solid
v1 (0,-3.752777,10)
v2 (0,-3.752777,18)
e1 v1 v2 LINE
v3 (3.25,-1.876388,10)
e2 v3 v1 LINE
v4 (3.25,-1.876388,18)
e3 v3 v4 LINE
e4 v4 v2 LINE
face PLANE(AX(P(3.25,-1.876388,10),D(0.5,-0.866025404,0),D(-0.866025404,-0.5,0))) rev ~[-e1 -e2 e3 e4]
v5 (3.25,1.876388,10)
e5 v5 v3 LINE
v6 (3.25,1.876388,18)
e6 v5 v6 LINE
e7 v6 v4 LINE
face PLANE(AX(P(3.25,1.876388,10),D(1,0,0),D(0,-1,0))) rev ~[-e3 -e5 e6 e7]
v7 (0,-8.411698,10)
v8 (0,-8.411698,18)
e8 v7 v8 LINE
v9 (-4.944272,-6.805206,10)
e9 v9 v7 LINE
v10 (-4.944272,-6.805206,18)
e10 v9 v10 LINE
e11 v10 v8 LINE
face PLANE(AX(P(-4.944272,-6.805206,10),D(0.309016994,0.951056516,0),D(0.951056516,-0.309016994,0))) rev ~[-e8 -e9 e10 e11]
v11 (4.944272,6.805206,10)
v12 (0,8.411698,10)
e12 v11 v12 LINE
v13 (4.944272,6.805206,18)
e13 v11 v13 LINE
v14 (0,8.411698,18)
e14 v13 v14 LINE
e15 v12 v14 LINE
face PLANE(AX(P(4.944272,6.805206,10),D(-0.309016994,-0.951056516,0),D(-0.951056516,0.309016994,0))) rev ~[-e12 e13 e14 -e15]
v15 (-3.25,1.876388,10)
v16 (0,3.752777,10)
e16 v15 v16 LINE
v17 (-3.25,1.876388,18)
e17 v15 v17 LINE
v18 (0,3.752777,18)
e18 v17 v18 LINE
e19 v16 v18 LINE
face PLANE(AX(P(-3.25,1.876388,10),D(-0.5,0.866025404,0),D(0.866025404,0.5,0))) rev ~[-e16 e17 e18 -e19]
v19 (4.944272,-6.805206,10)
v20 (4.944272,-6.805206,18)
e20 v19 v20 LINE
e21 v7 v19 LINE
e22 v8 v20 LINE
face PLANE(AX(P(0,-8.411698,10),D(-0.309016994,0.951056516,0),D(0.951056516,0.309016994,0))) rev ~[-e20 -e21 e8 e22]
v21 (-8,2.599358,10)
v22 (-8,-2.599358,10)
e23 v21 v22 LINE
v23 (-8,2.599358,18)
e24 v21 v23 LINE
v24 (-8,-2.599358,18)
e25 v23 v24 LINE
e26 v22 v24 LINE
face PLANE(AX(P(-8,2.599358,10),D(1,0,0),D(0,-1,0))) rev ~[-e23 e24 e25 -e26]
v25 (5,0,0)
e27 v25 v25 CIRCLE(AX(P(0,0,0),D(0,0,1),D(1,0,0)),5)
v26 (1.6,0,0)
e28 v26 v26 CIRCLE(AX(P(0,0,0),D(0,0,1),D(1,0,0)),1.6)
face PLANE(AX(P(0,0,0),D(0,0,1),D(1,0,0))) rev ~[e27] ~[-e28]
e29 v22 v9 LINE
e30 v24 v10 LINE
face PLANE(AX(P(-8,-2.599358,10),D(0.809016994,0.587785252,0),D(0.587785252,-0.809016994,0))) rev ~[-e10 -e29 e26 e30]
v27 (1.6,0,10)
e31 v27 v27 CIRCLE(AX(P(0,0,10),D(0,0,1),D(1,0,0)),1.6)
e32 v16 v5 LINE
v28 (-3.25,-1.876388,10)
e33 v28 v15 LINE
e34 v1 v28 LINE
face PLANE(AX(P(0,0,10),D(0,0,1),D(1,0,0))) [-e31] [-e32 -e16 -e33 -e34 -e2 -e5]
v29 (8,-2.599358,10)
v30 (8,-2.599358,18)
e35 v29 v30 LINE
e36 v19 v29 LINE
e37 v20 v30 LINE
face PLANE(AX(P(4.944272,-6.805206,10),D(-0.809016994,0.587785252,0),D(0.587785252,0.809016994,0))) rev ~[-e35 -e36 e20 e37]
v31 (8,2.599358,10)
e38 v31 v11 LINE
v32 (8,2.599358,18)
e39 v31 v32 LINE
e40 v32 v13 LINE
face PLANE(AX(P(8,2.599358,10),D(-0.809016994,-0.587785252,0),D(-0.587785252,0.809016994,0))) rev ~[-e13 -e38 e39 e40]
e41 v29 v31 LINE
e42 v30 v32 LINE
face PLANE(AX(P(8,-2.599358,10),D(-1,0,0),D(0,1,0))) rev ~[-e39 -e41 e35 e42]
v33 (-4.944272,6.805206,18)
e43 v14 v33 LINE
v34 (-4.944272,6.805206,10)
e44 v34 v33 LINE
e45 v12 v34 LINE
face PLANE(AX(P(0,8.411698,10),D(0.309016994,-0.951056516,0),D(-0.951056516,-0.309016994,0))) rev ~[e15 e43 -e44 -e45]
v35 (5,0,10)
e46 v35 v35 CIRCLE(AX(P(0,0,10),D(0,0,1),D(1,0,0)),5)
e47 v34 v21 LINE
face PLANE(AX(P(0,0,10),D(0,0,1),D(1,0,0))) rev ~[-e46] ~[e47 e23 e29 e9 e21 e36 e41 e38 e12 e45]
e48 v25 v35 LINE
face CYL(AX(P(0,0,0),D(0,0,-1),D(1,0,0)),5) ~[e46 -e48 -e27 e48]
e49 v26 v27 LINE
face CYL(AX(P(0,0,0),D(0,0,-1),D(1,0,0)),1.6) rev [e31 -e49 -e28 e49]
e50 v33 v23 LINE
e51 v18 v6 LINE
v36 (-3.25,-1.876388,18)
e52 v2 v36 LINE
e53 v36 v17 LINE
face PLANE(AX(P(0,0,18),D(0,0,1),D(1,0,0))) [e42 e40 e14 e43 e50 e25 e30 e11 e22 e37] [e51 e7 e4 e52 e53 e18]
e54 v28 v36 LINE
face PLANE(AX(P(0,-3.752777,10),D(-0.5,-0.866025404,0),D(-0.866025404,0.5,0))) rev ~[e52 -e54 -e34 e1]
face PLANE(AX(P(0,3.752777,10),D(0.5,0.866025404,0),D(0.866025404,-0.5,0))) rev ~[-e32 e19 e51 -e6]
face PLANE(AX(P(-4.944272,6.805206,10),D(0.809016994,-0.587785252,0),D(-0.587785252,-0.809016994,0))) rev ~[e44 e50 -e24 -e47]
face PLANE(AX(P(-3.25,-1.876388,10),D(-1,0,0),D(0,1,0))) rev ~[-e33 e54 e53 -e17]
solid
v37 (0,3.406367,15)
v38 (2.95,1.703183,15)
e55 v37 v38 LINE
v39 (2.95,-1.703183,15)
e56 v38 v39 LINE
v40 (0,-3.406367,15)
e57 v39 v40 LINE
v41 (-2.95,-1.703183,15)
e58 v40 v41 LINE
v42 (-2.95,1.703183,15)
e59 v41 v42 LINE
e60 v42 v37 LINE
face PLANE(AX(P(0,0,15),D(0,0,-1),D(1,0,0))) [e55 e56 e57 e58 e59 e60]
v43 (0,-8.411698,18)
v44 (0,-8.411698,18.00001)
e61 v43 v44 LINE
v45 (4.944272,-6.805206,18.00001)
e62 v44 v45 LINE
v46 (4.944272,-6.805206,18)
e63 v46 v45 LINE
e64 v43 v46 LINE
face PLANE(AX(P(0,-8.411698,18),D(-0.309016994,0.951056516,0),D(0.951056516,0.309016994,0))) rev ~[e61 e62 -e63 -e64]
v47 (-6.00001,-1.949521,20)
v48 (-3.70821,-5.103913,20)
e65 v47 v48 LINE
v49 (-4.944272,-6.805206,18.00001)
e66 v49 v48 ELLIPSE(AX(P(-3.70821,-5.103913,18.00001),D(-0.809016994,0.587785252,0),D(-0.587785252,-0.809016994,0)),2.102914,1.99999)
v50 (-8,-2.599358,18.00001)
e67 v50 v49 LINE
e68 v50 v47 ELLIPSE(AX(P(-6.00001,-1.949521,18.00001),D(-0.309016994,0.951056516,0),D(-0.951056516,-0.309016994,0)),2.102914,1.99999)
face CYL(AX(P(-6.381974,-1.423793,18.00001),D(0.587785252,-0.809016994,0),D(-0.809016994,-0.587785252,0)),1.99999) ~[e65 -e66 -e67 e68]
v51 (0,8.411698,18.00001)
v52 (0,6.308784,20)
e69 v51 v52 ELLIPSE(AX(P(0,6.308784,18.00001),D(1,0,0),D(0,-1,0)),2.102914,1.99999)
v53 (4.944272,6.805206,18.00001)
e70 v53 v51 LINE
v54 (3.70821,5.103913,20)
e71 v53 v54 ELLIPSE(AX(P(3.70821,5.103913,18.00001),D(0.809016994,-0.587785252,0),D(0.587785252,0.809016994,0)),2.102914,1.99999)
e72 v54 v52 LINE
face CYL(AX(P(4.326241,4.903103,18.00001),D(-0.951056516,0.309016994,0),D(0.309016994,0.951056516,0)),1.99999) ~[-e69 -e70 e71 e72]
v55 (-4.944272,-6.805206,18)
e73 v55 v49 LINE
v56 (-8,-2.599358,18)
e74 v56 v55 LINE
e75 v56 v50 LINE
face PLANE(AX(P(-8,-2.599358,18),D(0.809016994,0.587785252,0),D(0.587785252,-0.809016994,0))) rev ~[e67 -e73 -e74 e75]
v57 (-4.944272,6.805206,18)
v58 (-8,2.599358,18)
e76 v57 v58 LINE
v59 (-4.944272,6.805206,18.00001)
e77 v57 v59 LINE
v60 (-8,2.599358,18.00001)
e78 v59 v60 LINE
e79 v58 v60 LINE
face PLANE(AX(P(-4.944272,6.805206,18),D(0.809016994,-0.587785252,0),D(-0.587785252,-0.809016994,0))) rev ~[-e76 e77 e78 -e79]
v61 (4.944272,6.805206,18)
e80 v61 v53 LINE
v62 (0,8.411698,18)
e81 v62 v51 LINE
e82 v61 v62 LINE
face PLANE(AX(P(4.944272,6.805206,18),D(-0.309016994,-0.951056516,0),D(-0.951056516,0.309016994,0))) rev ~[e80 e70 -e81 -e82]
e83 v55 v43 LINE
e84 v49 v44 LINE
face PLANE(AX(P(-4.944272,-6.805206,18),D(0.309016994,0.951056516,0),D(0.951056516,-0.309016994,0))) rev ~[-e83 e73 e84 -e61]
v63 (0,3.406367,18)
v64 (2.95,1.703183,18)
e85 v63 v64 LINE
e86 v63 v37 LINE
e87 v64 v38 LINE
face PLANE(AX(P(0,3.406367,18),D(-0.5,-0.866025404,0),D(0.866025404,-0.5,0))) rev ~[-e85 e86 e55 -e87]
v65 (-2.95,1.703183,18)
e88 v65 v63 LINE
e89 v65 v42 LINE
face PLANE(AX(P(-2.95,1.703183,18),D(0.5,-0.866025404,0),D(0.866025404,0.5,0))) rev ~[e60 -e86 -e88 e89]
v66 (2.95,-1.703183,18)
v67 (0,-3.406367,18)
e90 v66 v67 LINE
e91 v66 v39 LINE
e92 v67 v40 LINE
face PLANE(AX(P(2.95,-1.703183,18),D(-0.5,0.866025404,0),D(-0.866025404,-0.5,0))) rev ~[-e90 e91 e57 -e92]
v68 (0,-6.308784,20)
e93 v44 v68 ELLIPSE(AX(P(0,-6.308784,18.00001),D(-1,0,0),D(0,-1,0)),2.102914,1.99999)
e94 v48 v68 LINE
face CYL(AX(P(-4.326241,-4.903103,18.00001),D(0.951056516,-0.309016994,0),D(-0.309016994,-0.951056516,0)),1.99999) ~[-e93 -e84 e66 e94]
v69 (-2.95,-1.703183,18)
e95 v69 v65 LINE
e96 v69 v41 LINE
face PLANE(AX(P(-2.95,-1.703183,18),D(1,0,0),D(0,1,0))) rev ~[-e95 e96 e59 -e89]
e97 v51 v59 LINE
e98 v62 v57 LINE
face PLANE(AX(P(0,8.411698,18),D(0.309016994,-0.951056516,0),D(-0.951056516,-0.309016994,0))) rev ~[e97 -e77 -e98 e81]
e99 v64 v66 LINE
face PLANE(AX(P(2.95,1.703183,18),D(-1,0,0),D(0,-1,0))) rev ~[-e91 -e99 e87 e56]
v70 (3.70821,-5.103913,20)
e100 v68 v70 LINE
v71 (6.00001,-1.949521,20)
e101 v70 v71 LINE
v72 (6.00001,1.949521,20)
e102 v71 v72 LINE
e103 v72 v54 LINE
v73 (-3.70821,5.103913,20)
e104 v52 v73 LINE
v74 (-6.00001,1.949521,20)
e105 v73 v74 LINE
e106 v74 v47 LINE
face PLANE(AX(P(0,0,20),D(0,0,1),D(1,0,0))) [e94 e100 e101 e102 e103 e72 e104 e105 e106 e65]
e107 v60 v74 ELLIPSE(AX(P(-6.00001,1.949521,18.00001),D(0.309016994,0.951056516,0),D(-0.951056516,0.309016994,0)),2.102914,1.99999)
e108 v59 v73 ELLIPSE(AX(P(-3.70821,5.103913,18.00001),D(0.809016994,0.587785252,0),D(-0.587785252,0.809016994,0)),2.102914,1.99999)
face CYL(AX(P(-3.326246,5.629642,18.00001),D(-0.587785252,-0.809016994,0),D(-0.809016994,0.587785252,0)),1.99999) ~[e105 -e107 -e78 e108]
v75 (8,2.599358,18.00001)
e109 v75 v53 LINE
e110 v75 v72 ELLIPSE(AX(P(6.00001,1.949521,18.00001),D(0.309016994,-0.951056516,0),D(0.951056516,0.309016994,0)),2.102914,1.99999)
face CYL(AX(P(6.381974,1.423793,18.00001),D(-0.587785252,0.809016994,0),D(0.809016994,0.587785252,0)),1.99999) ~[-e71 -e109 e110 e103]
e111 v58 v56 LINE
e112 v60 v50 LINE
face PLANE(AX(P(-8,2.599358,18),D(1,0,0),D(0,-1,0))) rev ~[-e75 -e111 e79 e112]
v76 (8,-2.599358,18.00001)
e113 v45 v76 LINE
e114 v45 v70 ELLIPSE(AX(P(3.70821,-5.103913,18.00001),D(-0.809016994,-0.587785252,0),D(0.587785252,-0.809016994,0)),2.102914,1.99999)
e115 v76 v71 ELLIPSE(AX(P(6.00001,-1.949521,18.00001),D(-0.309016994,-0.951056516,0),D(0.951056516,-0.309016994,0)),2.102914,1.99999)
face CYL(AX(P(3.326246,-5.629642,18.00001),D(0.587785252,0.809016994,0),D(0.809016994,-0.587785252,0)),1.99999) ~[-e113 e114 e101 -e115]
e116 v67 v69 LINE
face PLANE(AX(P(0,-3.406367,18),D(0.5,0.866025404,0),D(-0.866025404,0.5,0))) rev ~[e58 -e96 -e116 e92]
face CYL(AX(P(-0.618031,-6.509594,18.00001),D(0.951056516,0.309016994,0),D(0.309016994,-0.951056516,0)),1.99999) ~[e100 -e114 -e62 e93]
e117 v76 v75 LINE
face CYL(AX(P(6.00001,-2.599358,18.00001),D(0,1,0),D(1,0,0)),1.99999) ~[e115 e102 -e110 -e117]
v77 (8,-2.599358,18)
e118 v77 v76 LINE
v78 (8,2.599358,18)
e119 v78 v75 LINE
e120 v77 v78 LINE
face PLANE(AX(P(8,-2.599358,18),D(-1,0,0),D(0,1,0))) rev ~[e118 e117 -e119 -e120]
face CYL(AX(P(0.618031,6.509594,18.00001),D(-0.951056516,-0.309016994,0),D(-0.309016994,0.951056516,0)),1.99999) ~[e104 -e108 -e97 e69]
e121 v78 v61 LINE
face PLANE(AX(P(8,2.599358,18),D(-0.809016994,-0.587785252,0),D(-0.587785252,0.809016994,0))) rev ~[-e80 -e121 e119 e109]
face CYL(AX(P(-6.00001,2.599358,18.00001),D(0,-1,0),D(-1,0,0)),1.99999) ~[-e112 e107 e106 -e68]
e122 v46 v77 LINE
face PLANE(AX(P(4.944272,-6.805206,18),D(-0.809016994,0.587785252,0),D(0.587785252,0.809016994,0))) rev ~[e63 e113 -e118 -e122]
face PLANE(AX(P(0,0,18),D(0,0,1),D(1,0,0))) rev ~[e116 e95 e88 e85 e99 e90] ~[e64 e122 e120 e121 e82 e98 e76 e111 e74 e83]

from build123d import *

# Parameters (mm, degrees)
F0_R     = 5
F0_R_2   = 1.6
F1_DEPTH = 10
F3_DEPTH = 8
F5_DEPTH = 2
F6_R     = 1.99999
F8_DEPTH = 3


# Not quite as in the source:
# - a fillet or chamfer is up to 0.001 mm smaller than in the source, because OpenCascade refuses the exact size


with BuildPart() as f1:
    # F0 (on Top) → F1 (new body)
    with BuildSketch(Plane.XY):
        Circle(F0_R)
        Circle(F0_R_2, mode=Mode.SUBTRACT)
    extrude(amount=F1_DEPTH)

    # F2 (on face) → F3 (join)
    with BuildSketch(Plane.XY.offset(10)):
        Polygon((8, -2.5993575699), (8, 2.5993575699), (4.94427191, 6.8052064668), (0, 8.4116977939), (-4.94427191, 6.8052064668), (-8, 2.5993575699), (-8, -2.5993575699), (-4.94427191, -6.8052064668), (0, -8.4116977939), (4.94427191, -6.8052064668), align=None)
        Polygon((0, 3.7527767497), (3.25, 1.8763883749), (3.25, -1.8763883749), (0, -3.7527767497), (-3.25, -1.8763883749), (-3.25, 1.8763883749), align=None, mode=Mode.SUBTRACT)
    extrude(amount=F3_DEPTH)


with BuildPart() as f5:
    # F4 (on face) → F5 (new body)
    with BuildSketch(Plane.XY.offset(18)):
        Polygon((0, 8.4116977939), (-4.94427191, 6.8052064668), (-8, 2.5993575699), (-8, -2.5993575699), (-4.94427191, -6.8052064668), (0, -8.4116977939), (4.94427191, -6.8052064668), (8, -2.5993575699), (8, 2.5993575699), (4.94427191, 6.8052064668), align=None)
    extrude(amount=F5_DEPTH)

    # F6 (radius 2 in the source; OpenCascade refuses exactly that, so slightly less here)
    f6_edges = [f5.edges().sort_by_distance(p)[0] for p in [
        (-2.472136, 7.608452, 20),
        (-6.472136, 4.702282, 20),
        (-8, 0, 20),
        (-6.472136, -4.702282, 20),
        (-2.472136, -7.608452, 20),
        (2.472136, -7.608452, 20),
        (6.472136, -4.702282, 20),
        (8, 0, 20),
        (6.472136, 4.702282, 20),
        (2.472136, 7.608452, 20),
    ]]
    fillet(f6_edges, radius=F6_R)

    # F7 (on face) → F8 (join)
    with BuildSketch(Plane(origin=(0, 0, 18), x_dir=(1, 0, 0), z_dir=(0, 0, -1))):
        Polygon((0, 3.406366662), (-2.9500000639, 1.703183331), (-2.9500000639, -1.703183331), (0, -3.406366662), (2.9500000639, -1.703183331), (2.9500000639, 1.703183331), align=None)
    extrude(amount=F8_DEPTH)


solid = Compound([f1.part, f5.part])
